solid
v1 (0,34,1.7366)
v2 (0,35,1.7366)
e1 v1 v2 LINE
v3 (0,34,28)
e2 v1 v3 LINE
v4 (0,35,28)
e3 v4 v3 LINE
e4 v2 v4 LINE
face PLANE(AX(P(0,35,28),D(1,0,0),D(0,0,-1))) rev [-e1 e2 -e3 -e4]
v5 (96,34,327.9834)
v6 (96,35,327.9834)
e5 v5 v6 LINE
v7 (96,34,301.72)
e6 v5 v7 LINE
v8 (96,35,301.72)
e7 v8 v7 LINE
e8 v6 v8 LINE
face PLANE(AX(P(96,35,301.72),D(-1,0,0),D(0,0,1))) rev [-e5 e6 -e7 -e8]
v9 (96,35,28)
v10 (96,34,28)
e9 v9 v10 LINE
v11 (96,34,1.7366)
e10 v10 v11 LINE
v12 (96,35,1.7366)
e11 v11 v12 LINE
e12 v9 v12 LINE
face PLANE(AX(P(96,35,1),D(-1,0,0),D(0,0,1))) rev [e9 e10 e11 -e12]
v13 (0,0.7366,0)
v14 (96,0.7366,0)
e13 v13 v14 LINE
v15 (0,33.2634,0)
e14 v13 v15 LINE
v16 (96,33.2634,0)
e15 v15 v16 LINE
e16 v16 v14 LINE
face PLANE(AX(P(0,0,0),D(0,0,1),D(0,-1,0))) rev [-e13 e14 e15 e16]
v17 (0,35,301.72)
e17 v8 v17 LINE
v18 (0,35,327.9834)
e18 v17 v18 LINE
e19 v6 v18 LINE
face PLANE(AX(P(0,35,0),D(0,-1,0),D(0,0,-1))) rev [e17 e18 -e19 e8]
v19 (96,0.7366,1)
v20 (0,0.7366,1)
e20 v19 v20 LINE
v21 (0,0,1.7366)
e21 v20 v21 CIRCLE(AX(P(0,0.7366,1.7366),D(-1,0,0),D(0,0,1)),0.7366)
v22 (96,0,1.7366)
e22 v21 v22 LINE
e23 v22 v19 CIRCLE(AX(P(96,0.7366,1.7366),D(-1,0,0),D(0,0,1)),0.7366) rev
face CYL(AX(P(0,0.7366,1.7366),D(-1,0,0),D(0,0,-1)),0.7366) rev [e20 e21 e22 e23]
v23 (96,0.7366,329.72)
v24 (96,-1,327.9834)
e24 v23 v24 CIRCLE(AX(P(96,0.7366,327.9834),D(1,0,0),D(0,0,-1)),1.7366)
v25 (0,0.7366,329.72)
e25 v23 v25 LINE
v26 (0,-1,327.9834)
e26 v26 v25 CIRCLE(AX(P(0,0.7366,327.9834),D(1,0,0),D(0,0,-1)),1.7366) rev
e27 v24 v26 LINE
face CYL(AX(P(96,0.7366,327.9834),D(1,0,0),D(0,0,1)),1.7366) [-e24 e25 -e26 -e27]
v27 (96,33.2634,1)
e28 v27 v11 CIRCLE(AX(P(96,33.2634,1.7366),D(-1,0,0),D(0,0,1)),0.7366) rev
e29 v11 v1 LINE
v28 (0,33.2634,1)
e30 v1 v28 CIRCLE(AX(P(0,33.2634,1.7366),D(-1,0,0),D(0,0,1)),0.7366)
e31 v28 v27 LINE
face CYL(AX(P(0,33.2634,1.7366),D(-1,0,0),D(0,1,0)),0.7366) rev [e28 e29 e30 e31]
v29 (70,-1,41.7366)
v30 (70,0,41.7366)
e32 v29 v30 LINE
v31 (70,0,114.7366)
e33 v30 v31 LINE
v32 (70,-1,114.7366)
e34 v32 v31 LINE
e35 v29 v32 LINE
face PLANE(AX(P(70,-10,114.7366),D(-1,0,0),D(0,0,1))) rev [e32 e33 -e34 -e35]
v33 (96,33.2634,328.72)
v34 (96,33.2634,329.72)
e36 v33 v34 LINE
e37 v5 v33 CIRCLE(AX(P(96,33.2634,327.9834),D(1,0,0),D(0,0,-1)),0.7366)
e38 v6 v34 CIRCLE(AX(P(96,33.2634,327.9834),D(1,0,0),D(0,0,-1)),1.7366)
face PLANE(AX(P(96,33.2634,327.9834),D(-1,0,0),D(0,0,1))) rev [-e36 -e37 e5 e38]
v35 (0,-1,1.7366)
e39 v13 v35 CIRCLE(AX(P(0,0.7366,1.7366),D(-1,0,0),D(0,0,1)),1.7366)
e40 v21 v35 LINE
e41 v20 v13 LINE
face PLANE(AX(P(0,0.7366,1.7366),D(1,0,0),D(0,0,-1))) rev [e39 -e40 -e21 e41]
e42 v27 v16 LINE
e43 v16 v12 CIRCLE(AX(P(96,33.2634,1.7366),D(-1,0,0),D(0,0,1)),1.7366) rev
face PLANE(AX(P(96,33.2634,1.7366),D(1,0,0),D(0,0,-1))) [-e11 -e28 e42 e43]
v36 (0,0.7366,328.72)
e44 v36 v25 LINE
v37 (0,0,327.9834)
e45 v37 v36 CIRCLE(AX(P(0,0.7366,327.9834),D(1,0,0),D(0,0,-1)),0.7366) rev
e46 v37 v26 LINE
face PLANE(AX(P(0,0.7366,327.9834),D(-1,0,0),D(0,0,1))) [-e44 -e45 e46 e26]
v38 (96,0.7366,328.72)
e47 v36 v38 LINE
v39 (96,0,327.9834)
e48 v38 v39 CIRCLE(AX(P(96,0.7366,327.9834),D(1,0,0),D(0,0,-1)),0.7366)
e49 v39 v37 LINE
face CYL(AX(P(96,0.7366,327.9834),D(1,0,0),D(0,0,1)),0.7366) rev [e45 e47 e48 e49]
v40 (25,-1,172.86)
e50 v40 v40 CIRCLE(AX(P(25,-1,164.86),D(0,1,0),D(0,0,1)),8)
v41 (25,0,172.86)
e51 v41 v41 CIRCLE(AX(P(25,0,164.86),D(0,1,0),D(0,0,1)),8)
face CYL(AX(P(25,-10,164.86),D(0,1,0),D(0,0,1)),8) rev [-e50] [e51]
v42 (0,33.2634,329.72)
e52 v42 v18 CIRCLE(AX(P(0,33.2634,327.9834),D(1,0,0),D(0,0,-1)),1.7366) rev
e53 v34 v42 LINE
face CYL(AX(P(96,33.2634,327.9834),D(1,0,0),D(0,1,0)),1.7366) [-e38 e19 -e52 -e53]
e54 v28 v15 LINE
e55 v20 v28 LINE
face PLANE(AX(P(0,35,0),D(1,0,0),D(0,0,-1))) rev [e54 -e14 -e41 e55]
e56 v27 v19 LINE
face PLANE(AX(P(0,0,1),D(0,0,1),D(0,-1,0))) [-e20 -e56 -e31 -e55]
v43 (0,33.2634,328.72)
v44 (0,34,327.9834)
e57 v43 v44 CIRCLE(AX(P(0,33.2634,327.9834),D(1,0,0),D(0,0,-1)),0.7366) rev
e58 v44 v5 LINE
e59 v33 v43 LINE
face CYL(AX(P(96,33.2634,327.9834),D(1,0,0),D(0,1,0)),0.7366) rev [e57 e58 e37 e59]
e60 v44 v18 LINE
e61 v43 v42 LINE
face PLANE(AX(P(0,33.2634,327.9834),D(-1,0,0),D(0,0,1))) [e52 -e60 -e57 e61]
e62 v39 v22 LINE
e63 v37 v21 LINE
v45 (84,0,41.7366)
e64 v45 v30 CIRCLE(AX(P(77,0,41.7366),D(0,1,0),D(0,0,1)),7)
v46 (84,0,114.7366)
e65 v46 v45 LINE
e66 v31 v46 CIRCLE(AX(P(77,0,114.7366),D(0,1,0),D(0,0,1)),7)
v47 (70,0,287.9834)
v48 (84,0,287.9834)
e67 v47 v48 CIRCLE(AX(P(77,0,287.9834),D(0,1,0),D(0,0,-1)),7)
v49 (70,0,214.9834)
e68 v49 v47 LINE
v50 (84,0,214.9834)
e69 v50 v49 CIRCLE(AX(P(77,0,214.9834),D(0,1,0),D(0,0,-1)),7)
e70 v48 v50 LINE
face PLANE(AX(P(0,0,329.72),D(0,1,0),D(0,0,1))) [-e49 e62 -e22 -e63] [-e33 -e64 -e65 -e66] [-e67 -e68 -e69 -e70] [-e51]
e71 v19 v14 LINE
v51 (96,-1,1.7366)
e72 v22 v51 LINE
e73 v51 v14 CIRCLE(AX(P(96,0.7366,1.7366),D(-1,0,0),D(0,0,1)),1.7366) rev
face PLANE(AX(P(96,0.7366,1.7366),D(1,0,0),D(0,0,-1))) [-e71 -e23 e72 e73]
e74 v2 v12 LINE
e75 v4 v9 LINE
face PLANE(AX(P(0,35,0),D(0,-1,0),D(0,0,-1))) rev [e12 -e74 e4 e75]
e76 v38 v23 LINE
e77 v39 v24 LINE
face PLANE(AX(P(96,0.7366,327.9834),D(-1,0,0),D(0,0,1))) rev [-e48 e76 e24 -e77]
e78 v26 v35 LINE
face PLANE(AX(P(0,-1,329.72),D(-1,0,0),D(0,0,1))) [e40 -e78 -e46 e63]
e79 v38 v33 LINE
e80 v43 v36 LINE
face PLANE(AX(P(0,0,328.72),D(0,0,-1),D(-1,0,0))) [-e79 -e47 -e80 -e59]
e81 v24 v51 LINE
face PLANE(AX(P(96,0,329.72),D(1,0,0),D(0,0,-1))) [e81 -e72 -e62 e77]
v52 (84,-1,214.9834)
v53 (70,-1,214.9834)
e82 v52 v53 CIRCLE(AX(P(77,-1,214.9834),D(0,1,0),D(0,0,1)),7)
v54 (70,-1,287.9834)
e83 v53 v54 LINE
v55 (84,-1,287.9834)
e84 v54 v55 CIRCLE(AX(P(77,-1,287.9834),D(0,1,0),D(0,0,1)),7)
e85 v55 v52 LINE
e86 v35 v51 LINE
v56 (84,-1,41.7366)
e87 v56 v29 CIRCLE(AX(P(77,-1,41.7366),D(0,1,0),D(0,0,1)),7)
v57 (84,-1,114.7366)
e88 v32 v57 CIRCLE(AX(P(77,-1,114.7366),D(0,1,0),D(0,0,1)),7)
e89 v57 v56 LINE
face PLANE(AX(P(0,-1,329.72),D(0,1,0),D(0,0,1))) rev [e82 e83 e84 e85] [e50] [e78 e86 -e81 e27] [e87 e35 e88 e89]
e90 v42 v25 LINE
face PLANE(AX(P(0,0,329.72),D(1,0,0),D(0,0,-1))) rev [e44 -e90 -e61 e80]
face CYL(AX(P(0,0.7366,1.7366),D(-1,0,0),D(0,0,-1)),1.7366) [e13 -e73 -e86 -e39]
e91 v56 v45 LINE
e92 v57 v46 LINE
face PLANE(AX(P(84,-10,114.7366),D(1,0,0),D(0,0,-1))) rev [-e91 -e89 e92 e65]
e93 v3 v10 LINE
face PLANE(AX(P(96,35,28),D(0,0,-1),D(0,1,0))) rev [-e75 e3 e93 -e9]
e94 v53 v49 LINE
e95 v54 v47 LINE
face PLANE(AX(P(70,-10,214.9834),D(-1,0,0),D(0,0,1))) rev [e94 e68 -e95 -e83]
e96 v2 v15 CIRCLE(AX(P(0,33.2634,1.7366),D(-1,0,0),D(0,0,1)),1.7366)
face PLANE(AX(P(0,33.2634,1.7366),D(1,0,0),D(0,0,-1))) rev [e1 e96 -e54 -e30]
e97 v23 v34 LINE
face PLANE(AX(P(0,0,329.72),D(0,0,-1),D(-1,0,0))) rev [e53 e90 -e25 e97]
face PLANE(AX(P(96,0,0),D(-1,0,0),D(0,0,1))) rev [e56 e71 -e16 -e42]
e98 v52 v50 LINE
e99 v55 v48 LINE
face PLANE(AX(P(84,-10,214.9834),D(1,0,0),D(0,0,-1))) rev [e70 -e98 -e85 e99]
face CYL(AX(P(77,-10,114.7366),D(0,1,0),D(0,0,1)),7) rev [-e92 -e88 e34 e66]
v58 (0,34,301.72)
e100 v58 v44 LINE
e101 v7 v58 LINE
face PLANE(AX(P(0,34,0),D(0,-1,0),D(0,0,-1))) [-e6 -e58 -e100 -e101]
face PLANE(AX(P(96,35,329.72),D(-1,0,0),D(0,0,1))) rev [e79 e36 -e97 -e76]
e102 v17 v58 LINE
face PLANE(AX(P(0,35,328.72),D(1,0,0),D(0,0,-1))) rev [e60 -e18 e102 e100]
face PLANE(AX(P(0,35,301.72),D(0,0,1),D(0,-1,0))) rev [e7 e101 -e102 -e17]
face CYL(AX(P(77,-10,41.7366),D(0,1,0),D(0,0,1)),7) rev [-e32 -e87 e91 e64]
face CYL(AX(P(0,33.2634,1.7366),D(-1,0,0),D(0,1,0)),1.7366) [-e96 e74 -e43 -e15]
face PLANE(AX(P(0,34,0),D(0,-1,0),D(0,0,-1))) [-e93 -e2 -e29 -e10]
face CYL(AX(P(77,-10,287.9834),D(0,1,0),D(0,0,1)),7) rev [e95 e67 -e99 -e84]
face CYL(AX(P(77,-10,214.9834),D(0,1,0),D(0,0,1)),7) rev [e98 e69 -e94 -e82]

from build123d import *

# Parameters (mm, degrees)
SKETCH1_W                    = 96
SKETCH1_H                    = 1
BASE_FLANGE1_DEPTH           = 329.72
EDGE_FLANGE1_STRIP_W         = 5.4732
EDGE_FLANGE1_STRIP_H         = 1
EDGE_FLANGE1_STRIP_CUT_DEPTH = 96
EDGE_FLANGE1_DEPTH           = 96
EDGE_FLANGE2_STRIP_W         = 5.4732
EDGE_FLANGE2_STRIP_H         = 1
EDGE_FLANGE2_STRIP_CUT_DEPTH = 96
EDGE_FLANGE2_DEPTH           = 96
EDGE_FLANGE3_STRIP_W         = 5.4732
EDGE_FLANGE3_STRIP_H         = 1
EDGE_FLANGE3_STRIP_CUT_DEPTH = 96
EDGE_FLANGE3_DEPTH           = 96
EDGE_FLANGE4_STRIP_W         = 5.4732
EDGE_FLANGE4_STRIP_H         = 1
EDGE_FLANGE4_STRIP_CUT_DEPTH = 96
EDGE_FLANGE4_DEPTH           = 96
CUT_EXTRUDE1_DEPTH           = 10
SKETCH23_R                   = 8
CUT_EXTRUDE4_DEPTH           = 10


# Sheet-metal steps are written as plain solids
with BuildPart() as part:
    # Sketch1 → Base-Flange1 (new body)
    with BuildSketch(Plane.XY):
        with Locations((48, -0.5)):
            Rectangle(SKETCH1_W, SKETCH1_H)
    extrude(amount=BASE_FLANGE1_DEPTH)

    # Edge-Flange1 strip (across the edge) → Edge-Flange1 strip cut (cut)
    with BuildSketch(Plane(origin=(0, 0, 329.72), x_dir=(0, 0, -1), z_dir=(1, 0, 0))):
        with Locations((-1, -0.5)):
            Rectangle(EDGE_FLANGE1_STRIP_W, EDGE_FLANGE1_STRIP_H)
    extrude(amount=EDGE_FLANGE1_STRIP_CUT_DEPTH, mode=Mode.SUBTRACT)

    # Edge-Flange1 section (across the edge) → Edge-Flange1 (add)
    with BuildSketch(Plane(origin=(0, 0, 329.72), x_dir=(0, 0, -1), z_dir=(1, 0, 0))):
        with BuildLine():
            Line((0, 0.7366), (0, 35))
            Line((0, 35), (1, 35))
            Line((1, 35), (1, 0.7366))
            ThreePointArc((1, 0.7366), (1.215745145, 0.215745145), (1.7366, 0))
            Line((1.7366, 0), (1.7366, -1))
            ThreePointArc((1.7366, -1), (0.508638364, -0.491361636), (0, 0.7366))
        make_face()
    extrude(amount=EDGE_FLANGE1_DEPTH)

    # Edge-Flange2 strip (across the edge) → Edge-Flange2 strip cut (cut)
    with BuildSketch(Plane.ZY.offset(-96)):
        with Locations((-1, -0.5)):
            Rectangle(EDGE_FLANGE2_STRIP_W, EDGE_FLANGE2_STRIP_H)
    extrude(amount=EDGE_FLANGE2_STRIP_CUT_DEPTH, mode=Mode.SUBTRACT)

    # Edge-Flange2 section (across the edge) → Edge-Flange2 (add)
    with BuildSketch(Plane.ZY.offset(-96)):
        with BuildLine():
            Line((0, 0.7366), (0, 35))
            Line((0, 35), (1, 35))
            Line((1, 35), (1, 0.7366))
            ThreePointArc((1, 0.7366), (1.215745145, 0.215745145), (1.7366, 0))
            Line((1.7366, 0), (1.7366, -1))
            ThreePointArc((1.7366, -1), (0.508638364, -0.491361636), (0, 0.7366))
        make_face()
    extrude(amount=EDGE_FLANGE2_DEPTH)

    # Edge-Flange3 strip (across the edge) → Edge-Flange3 strip cut (cut)
    with BuildSketch(Plane(origin=(0, 35, 328.72), x_dir=(0, -1, 0), z_dir=(1, 0, 0))):
        with Locations((-1, -0.5)):
            Rectangle(EDGE_FLANGE3_STRIP_W, EDGE_FLANGE3_STRIP_H)
    extrude(amount=EDGE_FLANGE3_STRIP_CUT_DEPTH, mode=Mode.SUBTRACT)

    # Edge-Flange3 section (across the edge) → Edge-Flange3 (add)
    with BuildSketch(Plane(origin=(0, 35, 328.72), x_dir=(0, -1, 0), z_dir=(1, 0, 0))):
        with BuildLine():
            Line((0, 0.7366), (0, 27))
            Line((0, 27), (1, 27))
            Line((1, 27), (1, 0.7366))
            ThreePointArc((1, 0.7366), (1.215745145, 0.215745145), (1.7366, 0))
            Line((1.7366, 0), (1.7366, -1))
            ThreePointArc((1.7366, -1), (0.508638364, -0.491361636), (0, 0.7366))
        make_face()
    extrude(amount=EDGE_FLANGE3_DEPTH)

    # Edge-Flange4 strip (across the edge) → Edge-Flange4 strip cut (cut)
    with BuildSketch(Plane(origin=(96, 35, 1), x_dir=(0, -1, 0), z_dir=(-1, 0, 0))):
        with Locations((-1, -0.5)):
            Rectangle(EDGE_FLANGE4_STRIP_W, EDGE_FLANGE4_STRIP_H)
    extrude(amount=EDGE_FLANGE4_STRIP_CUT_DEPTH, mode=Mode.SUBTRACT)

    # Edge-Flange4 section (across the edge) → Edge-Flange4 (add)
    with BuildSketch(Plane(origin=(96, 35, 1), x_dir=(0, -1, 0), z_dir=(-1, 0, 0))):
        with BuildLine():
            Line((0, 0.7366), (0, 27))
            Line((0, 27), (1, 27))
            Line((1, 27), (1, 0.7366))
            ThreePointArc((1, 0.7366), (1.215745145, 0.215745145), (1.7366, 0))
            Line((1.7366, 0), (1.7366, -1))
            ThreePointArc((1.7366, -1), (0.508638364, -0.491361636), (0, 0.7366))
        make_face()
    extrude(amount=EDGE_FLANGE4_DEPTH)

    # Sketch22 → Cut-Extrude1 (cut)
    with BuildSketch(Plane(origin=(0, 0, 0), x_dir=(1, 0, 0), z_dir=(0, 1, 0))):
        with BuildLine():
            Line((70, -214.9834), (70, -287.9834))
            ThreePointArc((70, -287.9834), (77, -294.9834), (84, -287.9834))
            Line((84, -287.9834), (84, -214.9834))
            ThreePointArc((84, -214.9834), (77, -207.9834), (70, -214.9834))
        make_face()
        with BuildLine():
            Line((70, -114.7366), (70, -41.7366))
            ThreePointArc((70, -41.7366), (77, -34.7366), (84, -41.7366))
            Line((84, -41.7366), (84, -114.7366))
            ThreePointArc((84, -114.7366), (77, -121.7366), (70, -114.7366))
        make_face()
    extrude(amount=-CUT_EXTRUDE1_DEPTH, mode=Mode.SUBTRACT)

    # Sketch23 → Cut-Extrude4 (cut)
    with BuildSketch(Plane(origin=(0, 0, 0), x_dir=(1, 0, 0), z_dir=(0, 1, 0))):
        with Locations(Location((25, -164.86, 0), (0, 0, 270))):
            Circle(SKETCH23_R)
    extrude(amount=-CUT_EXTRUDE4_DEPTH, mode=Mode.SUBTRACT)


solid = part.part
